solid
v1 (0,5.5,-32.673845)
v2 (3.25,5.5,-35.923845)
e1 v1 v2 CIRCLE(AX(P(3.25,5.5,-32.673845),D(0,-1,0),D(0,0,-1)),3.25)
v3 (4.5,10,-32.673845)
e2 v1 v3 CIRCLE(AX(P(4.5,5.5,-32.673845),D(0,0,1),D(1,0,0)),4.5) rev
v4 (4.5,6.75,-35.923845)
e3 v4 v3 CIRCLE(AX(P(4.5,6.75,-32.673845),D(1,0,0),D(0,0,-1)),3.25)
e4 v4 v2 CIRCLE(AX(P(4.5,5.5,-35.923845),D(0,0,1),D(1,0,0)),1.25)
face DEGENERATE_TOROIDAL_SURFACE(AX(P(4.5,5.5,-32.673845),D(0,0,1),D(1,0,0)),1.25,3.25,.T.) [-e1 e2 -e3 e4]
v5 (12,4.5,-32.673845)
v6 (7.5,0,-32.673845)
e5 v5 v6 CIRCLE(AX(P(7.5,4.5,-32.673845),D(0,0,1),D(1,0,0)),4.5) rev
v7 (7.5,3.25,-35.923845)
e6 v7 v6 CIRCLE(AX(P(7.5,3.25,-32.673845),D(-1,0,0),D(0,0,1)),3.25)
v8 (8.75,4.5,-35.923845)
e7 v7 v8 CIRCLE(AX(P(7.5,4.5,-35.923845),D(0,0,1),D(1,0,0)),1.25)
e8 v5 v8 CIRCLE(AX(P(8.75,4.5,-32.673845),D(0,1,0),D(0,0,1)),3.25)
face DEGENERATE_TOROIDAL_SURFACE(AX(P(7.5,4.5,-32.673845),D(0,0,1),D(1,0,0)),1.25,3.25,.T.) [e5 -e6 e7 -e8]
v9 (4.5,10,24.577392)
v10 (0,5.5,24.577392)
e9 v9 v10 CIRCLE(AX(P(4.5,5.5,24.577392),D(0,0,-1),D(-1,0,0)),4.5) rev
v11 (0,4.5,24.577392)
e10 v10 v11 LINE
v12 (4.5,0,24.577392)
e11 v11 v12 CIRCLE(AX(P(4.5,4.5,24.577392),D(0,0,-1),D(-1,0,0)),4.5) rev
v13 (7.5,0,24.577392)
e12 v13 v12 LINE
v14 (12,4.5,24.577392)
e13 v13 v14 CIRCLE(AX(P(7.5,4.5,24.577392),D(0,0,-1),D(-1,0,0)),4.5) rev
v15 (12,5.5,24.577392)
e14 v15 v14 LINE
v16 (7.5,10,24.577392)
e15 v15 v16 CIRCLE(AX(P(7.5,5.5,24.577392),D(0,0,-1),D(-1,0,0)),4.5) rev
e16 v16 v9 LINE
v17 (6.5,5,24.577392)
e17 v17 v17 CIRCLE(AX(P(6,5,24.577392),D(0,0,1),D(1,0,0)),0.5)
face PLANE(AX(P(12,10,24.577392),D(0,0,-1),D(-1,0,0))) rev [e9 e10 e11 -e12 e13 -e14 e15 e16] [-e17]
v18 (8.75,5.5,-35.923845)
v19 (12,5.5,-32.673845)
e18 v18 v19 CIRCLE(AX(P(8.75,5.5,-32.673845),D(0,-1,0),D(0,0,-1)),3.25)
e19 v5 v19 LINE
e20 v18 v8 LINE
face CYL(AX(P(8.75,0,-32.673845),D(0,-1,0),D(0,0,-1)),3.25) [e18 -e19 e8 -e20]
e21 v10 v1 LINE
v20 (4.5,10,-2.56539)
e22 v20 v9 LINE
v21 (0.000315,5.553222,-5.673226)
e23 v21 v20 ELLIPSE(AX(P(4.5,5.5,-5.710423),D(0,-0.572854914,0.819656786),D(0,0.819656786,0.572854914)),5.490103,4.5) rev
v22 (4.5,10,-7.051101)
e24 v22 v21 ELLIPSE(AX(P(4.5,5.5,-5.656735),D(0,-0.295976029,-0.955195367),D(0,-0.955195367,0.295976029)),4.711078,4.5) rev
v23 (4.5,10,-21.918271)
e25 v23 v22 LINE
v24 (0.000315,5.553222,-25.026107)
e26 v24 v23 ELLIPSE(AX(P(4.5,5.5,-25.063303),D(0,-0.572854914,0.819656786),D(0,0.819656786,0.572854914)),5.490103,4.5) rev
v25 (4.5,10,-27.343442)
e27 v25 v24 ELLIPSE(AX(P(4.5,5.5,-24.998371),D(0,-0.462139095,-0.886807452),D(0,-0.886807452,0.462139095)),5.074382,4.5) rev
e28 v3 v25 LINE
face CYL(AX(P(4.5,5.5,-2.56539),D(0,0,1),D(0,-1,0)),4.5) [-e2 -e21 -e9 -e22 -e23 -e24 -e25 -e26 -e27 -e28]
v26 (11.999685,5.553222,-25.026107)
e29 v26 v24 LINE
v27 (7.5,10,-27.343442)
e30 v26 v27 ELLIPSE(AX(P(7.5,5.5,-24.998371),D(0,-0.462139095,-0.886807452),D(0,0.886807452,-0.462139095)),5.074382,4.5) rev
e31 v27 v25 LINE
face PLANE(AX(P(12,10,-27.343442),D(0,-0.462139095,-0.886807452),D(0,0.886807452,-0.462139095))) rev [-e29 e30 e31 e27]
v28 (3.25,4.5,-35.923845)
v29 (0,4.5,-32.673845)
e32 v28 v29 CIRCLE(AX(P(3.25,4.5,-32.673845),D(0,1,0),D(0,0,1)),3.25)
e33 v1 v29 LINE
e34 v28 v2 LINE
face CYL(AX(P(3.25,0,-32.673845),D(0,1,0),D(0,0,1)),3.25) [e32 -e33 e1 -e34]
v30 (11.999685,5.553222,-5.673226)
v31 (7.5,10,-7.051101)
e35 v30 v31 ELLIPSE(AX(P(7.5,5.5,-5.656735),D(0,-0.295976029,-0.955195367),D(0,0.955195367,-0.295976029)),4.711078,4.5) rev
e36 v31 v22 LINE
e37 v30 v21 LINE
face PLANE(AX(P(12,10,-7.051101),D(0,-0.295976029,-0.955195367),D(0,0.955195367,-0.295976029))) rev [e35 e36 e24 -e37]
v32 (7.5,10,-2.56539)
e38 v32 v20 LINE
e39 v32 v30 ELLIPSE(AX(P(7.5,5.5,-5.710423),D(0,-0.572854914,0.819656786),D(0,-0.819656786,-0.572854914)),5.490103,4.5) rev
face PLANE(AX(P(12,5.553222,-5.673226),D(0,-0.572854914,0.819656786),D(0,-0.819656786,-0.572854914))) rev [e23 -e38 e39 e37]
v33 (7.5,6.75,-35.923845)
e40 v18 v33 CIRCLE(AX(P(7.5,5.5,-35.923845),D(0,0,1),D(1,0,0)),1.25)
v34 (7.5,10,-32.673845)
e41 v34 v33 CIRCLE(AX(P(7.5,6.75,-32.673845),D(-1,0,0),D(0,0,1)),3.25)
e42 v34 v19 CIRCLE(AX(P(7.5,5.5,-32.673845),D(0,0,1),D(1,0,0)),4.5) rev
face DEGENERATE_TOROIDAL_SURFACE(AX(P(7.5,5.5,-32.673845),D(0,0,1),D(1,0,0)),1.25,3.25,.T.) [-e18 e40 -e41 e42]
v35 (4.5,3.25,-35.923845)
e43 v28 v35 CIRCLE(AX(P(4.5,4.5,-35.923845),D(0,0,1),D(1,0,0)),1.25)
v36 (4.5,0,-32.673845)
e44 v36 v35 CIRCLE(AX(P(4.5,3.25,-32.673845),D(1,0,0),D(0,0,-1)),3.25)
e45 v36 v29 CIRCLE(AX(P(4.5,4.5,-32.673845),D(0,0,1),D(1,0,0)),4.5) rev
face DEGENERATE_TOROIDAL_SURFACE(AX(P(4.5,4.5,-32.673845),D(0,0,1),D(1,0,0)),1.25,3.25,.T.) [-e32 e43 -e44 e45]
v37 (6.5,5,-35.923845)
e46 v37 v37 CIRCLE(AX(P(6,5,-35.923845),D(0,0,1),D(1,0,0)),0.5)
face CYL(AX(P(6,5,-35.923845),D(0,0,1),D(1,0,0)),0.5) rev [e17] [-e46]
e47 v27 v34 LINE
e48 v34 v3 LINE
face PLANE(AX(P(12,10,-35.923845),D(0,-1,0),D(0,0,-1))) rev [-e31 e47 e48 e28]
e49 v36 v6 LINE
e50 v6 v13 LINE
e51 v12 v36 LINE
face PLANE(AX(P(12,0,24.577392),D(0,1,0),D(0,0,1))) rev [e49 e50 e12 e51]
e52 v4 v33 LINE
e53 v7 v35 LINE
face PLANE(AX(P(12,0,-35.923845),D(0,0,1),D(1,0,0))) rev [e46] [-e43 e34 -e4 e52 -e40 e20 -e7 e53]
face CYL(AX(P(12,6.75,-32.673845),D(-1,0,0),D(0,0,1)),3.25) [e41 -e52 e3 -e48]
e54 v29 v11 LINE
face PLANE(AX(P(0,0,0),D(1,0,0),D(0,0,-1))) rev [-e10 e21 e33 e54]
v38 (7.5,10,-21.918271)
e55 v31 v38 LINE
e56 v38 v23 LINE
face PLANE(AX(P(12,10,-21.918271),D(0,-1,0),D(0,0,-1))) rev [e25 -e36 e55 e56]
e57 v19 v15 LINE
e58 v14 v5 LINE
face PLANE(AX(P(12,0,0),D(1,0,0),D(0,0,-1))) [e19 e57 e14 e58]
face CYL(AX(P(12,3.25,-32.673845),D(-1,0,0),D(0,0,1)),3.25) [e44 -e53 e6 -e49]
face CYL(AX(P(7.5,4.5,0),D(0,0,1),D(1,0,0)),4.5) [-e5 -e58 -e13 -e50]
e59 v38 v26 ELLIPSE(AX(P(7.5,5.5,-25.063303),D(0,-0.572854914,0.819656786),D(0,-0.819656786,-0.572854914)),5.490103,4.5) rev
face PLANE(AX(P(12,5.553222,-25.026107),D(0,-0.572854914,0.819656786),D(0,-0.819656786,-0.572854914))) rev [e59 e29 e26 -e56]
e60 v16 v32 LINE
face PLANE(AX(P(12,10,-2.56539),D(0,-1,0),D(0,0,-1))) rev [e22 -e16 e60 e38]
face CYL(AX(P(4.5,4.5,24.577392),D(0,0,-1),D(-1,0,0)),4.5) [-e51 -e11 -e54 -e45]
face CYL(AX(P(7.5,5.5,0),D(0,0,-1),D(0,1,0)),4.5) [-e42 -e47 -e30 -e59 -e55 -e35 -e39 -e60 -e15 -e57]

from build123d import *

# Parameters (mm, degrees)
BOSS_EXTRUDE1_DEPTH = 12
SKETCH2_R           = 0.5
CUT_EXTRUDE1_DEPTH  = 63.485196025
FILLET1_R           = 3.25
FILLET2_R           = 4.5


with BuildPart() as part:
    # Sketch1 → Boss-Extrude1 (new body)
    with BuildSketch(Plane(origin=(0, 0, 0), x_dir=(0, 0, -1), z_dir=(1, 0, 0))):
        Polygon((-24.577392289, 0), (35.923845073, 0), (35.923845073, 10), (27.343441845, 10), (25.026106666, 5.553221685), (21.918270736, 10), (7.051101363, 10), (5.673226392, 5.553221685), (2.565390462, 10), (-24.577392289, 10), align=None)
    extrude(amount=BOSS_EXTRUDE1_DEPTH)

    # Sketch2 → Cut-Extrude1 (cut, through all)
    with BuildSketch(Plane.XY.offset(24.577392289)):
        with Locations((6, 5)):
            Circle(SKETCH2_R)
    extrude(amount=-CUT_EXTRUDE1_DEPTH, mode=Mode.SUBTRACT)

    # Fillet1
    fillet1_edges = [part.edges().sort_by_distance(p)[0] for p in [
        (12, 5, -35.923845073),
        (0, 5, -35.923845073),
        (6, 10, -35.923845073),
        (6, 0, -35.923845073),
    ]]
    fillet(fillet1_edges, radius=FILLET1_R)

    # Fillet2
    # the kernel refuses this fillet: 4.5 mm, written as the material it takes off along each edge
    with BuildSketch(Plane(origin=(4.5, 4.5, -35.923845073), x_dir=(0, -1, 0), z_dir=(1, 0, 0))) as fillet2_piece_1:
        with BuildLine():
            CenterArc((1.25, -3.25), 3.25, 0, 90)
            Line((4.5, -3.25), (4.5, 0))
            Line((4.5, 0), (1.25, 0))
        make_face()
    revolve(axis=Axis((4.5, 4.5, -35.923845073), (0, 0, -1)), revolution_arc=90, mode=Mode.SUBTRACT)
    with BuildSketch(Plane(origin=(4.5, 5.5, -35.923845073), x_dir=(-1, 0, 0), z_dir=(0, -1, 0))) as fillet2_piece_2:
        with BuildLine():
            CenterArc((1.25, -3.25), 3.25, 0, 90)
            Line((4.5, -3.25), (4.5, 0))
            Line((4.5, 0), (1.25, 0))
        make_face()
    revolve(axis=Axis((4.5, 5.5, -35.923845073), (0, 0, -1)), revolution_arc=90, mode=Mode.SUBTRACT)
    with BuildSketch(Plane(origin=(7.5, 4.5, -35.923845073), x_dir=(1, 0, 0), z_dir=(0, 1, 0))) as fillet2_piece_3:
        with BuildLine():
            CenterArc((1.25, -3.25), 3.25, 0, 90)
            Line((4.5, -3.25), (4.5, 0))
            Line((4.5, 0), (1.25, 0))
        make_face()
    revolve(axis=Axis((7.5, 4.5, -35.923845073), (0, 0, -1)), revolution_arc=90, mode=Mode.SUBTRACT)
    with BuildSketch(Plane(origin=(7.5, 5.5, -35.923845073), x_dir=(0, 1, 0), z_dir=(-1, 0, 0))) as fillet2_piece_4:
        with BuildLine():
            CenterArc((1.25, -3.25), 3.25, 0, 90)
            Line((4.5, -3.25), (4.5, 0))
            Line((4.5, 0), (1.25, 0))
        make_face()
    revolve(axis=Axis((7.5, 5.5, -35.923845073), (0, 0, -1)), revolution_arc=90, mode=Mode.SUBTRACT)
    with BuildSketch(Plane(origin=(0, 10, -33.168270736), x_dir=(0, -1, 0), z_dir=(0, 0, 1))) as fillet2_piece_5:
        with BuildLine():
            CenterArc((FILLET2_R, FILLET2_R), FILLET2_R, 180, 90)
            Line((0, FILLET2_R), (0, 0))
            Line((0, 0), (FILLET2_R, 0))
        make_face()
    extrude(amount=37.367169374, mode=Mode.SUBTRACT)
    with BuildSketch(Plane(origin=(0, 0, 35.827392289), x_dir=(1, 0, 0), z_dir=(0, 0, -1))) as fillet2_piece_6:
        with BuildLine():
            CenterArc((FILLET2_R, -FILLET2_R), FILLET2_R, 90, 90)
            Line((0, -FILLET2_R), (0, 0))
            Line((0, 0), (FILLET2_R, 0))
        make_face()
    extrude(amount=71.751237362, mode=Mode.SUBTRACT)
    with BuildSketch(Plane(origin=(12, 10, -33.168270736), x_dir=(0, -1, 0), z_dir=(0, 0, 1))) as fillet2_piece_7:
        with BuildLine():
            CenterArc((FILLET2_R, -FILLET2_R), FILLET2_R, 90, 90)
            Line((0, -FILLET2_R), (0, 0))
            Line((0, 0), (FILLET2_R, 0))
        make_face()
    extrude(amount=37.367169374, mode=Mode.SUBTRACT)
    with BuildSketch(Plane(origin=(12, 10, -13.815390462), x_dir=(0, -1, 0), z_dir=(0, 0, 1))) as fillet2_piece_8:
        with BuildLine():
            CenterArc((FILLET2_R, -FILLET2_R), FILLET2_R, 90, 90)
            Line((0, -FILLET2_R), (0, 0))
            Line((0, 0), (FILLET2_R, 0))
        make_face()
    extrude(amount=49.642782751, mode=Mode.SUBTRACT)
    with BuildSketch(Plane(origin=(12, 10, -35.923845073), x_dir=(0, -1, 0), z_dir=(0, 0, 1))) as fillet2_piece_9:
        with BuildLine():
            CenterArc((FILLET2_R, -FILLET2_R), FILLET2_R, 90, 90)
            Line((0, -FILLET2_R), (0, 0))
            Line((0, 0), (FILLET2_R, 0))
        make_face()
    extrude(amount=19.830403228, mode=Mode.SUBTRACT)
    with BuildSketch(Plane(origin=(0, 10, -35.923845073), x_dir=(0, -1, 0), z_dir=(0, 0, 1))) as fillet2_piece_10:
        with BuildLine():
            CenterArc((FILLET2_R, FILLET2_R), FILLET2_R, 180, 90)
            Line((0, FILLET2_R), (0, 0))
            Line((0, 0), (FILLET2_R, 0))
        make_face()
    extrude(amount=19.830403228, mode=Mode.SUBTRACT)
    with BuildSketch(Plane(origin=(12, 0, 35.827392289), x_dir=(-1, 0, 0), z_dir=(0, 0, -1))) as fillet2_piece_11:
        with BuildLine():
            CenterArc((FILLET2_R, FILLET2_R), FILLET2_R, 180, 90)
            Line((0, FILLET2_R), (0, 0))
            Line((0, 0), (FILLET2_R, 0))
        make_face()
    extrude(amount=71.751237362, mode=Mode.SUBTRACT)
    with BuildSketch(Plane(origin=(0, 10, -13.815390462), x_dir=(0, -1, 0), z_dir=(0, 0, 1))) as fillet2_piece_12:
        with BuildLine():
            CenterArc((FILLET2_R, FILLET2_R), FILLET2_R, 180, 90)
            Line((0, FILLET2_R), (0, 0))
            Line((0, 0), (FILLET2_R, 0))
        make_face()
    extrude(amount=49.642782751, mode=Mode.SUBTRACT)


solid = part.part
